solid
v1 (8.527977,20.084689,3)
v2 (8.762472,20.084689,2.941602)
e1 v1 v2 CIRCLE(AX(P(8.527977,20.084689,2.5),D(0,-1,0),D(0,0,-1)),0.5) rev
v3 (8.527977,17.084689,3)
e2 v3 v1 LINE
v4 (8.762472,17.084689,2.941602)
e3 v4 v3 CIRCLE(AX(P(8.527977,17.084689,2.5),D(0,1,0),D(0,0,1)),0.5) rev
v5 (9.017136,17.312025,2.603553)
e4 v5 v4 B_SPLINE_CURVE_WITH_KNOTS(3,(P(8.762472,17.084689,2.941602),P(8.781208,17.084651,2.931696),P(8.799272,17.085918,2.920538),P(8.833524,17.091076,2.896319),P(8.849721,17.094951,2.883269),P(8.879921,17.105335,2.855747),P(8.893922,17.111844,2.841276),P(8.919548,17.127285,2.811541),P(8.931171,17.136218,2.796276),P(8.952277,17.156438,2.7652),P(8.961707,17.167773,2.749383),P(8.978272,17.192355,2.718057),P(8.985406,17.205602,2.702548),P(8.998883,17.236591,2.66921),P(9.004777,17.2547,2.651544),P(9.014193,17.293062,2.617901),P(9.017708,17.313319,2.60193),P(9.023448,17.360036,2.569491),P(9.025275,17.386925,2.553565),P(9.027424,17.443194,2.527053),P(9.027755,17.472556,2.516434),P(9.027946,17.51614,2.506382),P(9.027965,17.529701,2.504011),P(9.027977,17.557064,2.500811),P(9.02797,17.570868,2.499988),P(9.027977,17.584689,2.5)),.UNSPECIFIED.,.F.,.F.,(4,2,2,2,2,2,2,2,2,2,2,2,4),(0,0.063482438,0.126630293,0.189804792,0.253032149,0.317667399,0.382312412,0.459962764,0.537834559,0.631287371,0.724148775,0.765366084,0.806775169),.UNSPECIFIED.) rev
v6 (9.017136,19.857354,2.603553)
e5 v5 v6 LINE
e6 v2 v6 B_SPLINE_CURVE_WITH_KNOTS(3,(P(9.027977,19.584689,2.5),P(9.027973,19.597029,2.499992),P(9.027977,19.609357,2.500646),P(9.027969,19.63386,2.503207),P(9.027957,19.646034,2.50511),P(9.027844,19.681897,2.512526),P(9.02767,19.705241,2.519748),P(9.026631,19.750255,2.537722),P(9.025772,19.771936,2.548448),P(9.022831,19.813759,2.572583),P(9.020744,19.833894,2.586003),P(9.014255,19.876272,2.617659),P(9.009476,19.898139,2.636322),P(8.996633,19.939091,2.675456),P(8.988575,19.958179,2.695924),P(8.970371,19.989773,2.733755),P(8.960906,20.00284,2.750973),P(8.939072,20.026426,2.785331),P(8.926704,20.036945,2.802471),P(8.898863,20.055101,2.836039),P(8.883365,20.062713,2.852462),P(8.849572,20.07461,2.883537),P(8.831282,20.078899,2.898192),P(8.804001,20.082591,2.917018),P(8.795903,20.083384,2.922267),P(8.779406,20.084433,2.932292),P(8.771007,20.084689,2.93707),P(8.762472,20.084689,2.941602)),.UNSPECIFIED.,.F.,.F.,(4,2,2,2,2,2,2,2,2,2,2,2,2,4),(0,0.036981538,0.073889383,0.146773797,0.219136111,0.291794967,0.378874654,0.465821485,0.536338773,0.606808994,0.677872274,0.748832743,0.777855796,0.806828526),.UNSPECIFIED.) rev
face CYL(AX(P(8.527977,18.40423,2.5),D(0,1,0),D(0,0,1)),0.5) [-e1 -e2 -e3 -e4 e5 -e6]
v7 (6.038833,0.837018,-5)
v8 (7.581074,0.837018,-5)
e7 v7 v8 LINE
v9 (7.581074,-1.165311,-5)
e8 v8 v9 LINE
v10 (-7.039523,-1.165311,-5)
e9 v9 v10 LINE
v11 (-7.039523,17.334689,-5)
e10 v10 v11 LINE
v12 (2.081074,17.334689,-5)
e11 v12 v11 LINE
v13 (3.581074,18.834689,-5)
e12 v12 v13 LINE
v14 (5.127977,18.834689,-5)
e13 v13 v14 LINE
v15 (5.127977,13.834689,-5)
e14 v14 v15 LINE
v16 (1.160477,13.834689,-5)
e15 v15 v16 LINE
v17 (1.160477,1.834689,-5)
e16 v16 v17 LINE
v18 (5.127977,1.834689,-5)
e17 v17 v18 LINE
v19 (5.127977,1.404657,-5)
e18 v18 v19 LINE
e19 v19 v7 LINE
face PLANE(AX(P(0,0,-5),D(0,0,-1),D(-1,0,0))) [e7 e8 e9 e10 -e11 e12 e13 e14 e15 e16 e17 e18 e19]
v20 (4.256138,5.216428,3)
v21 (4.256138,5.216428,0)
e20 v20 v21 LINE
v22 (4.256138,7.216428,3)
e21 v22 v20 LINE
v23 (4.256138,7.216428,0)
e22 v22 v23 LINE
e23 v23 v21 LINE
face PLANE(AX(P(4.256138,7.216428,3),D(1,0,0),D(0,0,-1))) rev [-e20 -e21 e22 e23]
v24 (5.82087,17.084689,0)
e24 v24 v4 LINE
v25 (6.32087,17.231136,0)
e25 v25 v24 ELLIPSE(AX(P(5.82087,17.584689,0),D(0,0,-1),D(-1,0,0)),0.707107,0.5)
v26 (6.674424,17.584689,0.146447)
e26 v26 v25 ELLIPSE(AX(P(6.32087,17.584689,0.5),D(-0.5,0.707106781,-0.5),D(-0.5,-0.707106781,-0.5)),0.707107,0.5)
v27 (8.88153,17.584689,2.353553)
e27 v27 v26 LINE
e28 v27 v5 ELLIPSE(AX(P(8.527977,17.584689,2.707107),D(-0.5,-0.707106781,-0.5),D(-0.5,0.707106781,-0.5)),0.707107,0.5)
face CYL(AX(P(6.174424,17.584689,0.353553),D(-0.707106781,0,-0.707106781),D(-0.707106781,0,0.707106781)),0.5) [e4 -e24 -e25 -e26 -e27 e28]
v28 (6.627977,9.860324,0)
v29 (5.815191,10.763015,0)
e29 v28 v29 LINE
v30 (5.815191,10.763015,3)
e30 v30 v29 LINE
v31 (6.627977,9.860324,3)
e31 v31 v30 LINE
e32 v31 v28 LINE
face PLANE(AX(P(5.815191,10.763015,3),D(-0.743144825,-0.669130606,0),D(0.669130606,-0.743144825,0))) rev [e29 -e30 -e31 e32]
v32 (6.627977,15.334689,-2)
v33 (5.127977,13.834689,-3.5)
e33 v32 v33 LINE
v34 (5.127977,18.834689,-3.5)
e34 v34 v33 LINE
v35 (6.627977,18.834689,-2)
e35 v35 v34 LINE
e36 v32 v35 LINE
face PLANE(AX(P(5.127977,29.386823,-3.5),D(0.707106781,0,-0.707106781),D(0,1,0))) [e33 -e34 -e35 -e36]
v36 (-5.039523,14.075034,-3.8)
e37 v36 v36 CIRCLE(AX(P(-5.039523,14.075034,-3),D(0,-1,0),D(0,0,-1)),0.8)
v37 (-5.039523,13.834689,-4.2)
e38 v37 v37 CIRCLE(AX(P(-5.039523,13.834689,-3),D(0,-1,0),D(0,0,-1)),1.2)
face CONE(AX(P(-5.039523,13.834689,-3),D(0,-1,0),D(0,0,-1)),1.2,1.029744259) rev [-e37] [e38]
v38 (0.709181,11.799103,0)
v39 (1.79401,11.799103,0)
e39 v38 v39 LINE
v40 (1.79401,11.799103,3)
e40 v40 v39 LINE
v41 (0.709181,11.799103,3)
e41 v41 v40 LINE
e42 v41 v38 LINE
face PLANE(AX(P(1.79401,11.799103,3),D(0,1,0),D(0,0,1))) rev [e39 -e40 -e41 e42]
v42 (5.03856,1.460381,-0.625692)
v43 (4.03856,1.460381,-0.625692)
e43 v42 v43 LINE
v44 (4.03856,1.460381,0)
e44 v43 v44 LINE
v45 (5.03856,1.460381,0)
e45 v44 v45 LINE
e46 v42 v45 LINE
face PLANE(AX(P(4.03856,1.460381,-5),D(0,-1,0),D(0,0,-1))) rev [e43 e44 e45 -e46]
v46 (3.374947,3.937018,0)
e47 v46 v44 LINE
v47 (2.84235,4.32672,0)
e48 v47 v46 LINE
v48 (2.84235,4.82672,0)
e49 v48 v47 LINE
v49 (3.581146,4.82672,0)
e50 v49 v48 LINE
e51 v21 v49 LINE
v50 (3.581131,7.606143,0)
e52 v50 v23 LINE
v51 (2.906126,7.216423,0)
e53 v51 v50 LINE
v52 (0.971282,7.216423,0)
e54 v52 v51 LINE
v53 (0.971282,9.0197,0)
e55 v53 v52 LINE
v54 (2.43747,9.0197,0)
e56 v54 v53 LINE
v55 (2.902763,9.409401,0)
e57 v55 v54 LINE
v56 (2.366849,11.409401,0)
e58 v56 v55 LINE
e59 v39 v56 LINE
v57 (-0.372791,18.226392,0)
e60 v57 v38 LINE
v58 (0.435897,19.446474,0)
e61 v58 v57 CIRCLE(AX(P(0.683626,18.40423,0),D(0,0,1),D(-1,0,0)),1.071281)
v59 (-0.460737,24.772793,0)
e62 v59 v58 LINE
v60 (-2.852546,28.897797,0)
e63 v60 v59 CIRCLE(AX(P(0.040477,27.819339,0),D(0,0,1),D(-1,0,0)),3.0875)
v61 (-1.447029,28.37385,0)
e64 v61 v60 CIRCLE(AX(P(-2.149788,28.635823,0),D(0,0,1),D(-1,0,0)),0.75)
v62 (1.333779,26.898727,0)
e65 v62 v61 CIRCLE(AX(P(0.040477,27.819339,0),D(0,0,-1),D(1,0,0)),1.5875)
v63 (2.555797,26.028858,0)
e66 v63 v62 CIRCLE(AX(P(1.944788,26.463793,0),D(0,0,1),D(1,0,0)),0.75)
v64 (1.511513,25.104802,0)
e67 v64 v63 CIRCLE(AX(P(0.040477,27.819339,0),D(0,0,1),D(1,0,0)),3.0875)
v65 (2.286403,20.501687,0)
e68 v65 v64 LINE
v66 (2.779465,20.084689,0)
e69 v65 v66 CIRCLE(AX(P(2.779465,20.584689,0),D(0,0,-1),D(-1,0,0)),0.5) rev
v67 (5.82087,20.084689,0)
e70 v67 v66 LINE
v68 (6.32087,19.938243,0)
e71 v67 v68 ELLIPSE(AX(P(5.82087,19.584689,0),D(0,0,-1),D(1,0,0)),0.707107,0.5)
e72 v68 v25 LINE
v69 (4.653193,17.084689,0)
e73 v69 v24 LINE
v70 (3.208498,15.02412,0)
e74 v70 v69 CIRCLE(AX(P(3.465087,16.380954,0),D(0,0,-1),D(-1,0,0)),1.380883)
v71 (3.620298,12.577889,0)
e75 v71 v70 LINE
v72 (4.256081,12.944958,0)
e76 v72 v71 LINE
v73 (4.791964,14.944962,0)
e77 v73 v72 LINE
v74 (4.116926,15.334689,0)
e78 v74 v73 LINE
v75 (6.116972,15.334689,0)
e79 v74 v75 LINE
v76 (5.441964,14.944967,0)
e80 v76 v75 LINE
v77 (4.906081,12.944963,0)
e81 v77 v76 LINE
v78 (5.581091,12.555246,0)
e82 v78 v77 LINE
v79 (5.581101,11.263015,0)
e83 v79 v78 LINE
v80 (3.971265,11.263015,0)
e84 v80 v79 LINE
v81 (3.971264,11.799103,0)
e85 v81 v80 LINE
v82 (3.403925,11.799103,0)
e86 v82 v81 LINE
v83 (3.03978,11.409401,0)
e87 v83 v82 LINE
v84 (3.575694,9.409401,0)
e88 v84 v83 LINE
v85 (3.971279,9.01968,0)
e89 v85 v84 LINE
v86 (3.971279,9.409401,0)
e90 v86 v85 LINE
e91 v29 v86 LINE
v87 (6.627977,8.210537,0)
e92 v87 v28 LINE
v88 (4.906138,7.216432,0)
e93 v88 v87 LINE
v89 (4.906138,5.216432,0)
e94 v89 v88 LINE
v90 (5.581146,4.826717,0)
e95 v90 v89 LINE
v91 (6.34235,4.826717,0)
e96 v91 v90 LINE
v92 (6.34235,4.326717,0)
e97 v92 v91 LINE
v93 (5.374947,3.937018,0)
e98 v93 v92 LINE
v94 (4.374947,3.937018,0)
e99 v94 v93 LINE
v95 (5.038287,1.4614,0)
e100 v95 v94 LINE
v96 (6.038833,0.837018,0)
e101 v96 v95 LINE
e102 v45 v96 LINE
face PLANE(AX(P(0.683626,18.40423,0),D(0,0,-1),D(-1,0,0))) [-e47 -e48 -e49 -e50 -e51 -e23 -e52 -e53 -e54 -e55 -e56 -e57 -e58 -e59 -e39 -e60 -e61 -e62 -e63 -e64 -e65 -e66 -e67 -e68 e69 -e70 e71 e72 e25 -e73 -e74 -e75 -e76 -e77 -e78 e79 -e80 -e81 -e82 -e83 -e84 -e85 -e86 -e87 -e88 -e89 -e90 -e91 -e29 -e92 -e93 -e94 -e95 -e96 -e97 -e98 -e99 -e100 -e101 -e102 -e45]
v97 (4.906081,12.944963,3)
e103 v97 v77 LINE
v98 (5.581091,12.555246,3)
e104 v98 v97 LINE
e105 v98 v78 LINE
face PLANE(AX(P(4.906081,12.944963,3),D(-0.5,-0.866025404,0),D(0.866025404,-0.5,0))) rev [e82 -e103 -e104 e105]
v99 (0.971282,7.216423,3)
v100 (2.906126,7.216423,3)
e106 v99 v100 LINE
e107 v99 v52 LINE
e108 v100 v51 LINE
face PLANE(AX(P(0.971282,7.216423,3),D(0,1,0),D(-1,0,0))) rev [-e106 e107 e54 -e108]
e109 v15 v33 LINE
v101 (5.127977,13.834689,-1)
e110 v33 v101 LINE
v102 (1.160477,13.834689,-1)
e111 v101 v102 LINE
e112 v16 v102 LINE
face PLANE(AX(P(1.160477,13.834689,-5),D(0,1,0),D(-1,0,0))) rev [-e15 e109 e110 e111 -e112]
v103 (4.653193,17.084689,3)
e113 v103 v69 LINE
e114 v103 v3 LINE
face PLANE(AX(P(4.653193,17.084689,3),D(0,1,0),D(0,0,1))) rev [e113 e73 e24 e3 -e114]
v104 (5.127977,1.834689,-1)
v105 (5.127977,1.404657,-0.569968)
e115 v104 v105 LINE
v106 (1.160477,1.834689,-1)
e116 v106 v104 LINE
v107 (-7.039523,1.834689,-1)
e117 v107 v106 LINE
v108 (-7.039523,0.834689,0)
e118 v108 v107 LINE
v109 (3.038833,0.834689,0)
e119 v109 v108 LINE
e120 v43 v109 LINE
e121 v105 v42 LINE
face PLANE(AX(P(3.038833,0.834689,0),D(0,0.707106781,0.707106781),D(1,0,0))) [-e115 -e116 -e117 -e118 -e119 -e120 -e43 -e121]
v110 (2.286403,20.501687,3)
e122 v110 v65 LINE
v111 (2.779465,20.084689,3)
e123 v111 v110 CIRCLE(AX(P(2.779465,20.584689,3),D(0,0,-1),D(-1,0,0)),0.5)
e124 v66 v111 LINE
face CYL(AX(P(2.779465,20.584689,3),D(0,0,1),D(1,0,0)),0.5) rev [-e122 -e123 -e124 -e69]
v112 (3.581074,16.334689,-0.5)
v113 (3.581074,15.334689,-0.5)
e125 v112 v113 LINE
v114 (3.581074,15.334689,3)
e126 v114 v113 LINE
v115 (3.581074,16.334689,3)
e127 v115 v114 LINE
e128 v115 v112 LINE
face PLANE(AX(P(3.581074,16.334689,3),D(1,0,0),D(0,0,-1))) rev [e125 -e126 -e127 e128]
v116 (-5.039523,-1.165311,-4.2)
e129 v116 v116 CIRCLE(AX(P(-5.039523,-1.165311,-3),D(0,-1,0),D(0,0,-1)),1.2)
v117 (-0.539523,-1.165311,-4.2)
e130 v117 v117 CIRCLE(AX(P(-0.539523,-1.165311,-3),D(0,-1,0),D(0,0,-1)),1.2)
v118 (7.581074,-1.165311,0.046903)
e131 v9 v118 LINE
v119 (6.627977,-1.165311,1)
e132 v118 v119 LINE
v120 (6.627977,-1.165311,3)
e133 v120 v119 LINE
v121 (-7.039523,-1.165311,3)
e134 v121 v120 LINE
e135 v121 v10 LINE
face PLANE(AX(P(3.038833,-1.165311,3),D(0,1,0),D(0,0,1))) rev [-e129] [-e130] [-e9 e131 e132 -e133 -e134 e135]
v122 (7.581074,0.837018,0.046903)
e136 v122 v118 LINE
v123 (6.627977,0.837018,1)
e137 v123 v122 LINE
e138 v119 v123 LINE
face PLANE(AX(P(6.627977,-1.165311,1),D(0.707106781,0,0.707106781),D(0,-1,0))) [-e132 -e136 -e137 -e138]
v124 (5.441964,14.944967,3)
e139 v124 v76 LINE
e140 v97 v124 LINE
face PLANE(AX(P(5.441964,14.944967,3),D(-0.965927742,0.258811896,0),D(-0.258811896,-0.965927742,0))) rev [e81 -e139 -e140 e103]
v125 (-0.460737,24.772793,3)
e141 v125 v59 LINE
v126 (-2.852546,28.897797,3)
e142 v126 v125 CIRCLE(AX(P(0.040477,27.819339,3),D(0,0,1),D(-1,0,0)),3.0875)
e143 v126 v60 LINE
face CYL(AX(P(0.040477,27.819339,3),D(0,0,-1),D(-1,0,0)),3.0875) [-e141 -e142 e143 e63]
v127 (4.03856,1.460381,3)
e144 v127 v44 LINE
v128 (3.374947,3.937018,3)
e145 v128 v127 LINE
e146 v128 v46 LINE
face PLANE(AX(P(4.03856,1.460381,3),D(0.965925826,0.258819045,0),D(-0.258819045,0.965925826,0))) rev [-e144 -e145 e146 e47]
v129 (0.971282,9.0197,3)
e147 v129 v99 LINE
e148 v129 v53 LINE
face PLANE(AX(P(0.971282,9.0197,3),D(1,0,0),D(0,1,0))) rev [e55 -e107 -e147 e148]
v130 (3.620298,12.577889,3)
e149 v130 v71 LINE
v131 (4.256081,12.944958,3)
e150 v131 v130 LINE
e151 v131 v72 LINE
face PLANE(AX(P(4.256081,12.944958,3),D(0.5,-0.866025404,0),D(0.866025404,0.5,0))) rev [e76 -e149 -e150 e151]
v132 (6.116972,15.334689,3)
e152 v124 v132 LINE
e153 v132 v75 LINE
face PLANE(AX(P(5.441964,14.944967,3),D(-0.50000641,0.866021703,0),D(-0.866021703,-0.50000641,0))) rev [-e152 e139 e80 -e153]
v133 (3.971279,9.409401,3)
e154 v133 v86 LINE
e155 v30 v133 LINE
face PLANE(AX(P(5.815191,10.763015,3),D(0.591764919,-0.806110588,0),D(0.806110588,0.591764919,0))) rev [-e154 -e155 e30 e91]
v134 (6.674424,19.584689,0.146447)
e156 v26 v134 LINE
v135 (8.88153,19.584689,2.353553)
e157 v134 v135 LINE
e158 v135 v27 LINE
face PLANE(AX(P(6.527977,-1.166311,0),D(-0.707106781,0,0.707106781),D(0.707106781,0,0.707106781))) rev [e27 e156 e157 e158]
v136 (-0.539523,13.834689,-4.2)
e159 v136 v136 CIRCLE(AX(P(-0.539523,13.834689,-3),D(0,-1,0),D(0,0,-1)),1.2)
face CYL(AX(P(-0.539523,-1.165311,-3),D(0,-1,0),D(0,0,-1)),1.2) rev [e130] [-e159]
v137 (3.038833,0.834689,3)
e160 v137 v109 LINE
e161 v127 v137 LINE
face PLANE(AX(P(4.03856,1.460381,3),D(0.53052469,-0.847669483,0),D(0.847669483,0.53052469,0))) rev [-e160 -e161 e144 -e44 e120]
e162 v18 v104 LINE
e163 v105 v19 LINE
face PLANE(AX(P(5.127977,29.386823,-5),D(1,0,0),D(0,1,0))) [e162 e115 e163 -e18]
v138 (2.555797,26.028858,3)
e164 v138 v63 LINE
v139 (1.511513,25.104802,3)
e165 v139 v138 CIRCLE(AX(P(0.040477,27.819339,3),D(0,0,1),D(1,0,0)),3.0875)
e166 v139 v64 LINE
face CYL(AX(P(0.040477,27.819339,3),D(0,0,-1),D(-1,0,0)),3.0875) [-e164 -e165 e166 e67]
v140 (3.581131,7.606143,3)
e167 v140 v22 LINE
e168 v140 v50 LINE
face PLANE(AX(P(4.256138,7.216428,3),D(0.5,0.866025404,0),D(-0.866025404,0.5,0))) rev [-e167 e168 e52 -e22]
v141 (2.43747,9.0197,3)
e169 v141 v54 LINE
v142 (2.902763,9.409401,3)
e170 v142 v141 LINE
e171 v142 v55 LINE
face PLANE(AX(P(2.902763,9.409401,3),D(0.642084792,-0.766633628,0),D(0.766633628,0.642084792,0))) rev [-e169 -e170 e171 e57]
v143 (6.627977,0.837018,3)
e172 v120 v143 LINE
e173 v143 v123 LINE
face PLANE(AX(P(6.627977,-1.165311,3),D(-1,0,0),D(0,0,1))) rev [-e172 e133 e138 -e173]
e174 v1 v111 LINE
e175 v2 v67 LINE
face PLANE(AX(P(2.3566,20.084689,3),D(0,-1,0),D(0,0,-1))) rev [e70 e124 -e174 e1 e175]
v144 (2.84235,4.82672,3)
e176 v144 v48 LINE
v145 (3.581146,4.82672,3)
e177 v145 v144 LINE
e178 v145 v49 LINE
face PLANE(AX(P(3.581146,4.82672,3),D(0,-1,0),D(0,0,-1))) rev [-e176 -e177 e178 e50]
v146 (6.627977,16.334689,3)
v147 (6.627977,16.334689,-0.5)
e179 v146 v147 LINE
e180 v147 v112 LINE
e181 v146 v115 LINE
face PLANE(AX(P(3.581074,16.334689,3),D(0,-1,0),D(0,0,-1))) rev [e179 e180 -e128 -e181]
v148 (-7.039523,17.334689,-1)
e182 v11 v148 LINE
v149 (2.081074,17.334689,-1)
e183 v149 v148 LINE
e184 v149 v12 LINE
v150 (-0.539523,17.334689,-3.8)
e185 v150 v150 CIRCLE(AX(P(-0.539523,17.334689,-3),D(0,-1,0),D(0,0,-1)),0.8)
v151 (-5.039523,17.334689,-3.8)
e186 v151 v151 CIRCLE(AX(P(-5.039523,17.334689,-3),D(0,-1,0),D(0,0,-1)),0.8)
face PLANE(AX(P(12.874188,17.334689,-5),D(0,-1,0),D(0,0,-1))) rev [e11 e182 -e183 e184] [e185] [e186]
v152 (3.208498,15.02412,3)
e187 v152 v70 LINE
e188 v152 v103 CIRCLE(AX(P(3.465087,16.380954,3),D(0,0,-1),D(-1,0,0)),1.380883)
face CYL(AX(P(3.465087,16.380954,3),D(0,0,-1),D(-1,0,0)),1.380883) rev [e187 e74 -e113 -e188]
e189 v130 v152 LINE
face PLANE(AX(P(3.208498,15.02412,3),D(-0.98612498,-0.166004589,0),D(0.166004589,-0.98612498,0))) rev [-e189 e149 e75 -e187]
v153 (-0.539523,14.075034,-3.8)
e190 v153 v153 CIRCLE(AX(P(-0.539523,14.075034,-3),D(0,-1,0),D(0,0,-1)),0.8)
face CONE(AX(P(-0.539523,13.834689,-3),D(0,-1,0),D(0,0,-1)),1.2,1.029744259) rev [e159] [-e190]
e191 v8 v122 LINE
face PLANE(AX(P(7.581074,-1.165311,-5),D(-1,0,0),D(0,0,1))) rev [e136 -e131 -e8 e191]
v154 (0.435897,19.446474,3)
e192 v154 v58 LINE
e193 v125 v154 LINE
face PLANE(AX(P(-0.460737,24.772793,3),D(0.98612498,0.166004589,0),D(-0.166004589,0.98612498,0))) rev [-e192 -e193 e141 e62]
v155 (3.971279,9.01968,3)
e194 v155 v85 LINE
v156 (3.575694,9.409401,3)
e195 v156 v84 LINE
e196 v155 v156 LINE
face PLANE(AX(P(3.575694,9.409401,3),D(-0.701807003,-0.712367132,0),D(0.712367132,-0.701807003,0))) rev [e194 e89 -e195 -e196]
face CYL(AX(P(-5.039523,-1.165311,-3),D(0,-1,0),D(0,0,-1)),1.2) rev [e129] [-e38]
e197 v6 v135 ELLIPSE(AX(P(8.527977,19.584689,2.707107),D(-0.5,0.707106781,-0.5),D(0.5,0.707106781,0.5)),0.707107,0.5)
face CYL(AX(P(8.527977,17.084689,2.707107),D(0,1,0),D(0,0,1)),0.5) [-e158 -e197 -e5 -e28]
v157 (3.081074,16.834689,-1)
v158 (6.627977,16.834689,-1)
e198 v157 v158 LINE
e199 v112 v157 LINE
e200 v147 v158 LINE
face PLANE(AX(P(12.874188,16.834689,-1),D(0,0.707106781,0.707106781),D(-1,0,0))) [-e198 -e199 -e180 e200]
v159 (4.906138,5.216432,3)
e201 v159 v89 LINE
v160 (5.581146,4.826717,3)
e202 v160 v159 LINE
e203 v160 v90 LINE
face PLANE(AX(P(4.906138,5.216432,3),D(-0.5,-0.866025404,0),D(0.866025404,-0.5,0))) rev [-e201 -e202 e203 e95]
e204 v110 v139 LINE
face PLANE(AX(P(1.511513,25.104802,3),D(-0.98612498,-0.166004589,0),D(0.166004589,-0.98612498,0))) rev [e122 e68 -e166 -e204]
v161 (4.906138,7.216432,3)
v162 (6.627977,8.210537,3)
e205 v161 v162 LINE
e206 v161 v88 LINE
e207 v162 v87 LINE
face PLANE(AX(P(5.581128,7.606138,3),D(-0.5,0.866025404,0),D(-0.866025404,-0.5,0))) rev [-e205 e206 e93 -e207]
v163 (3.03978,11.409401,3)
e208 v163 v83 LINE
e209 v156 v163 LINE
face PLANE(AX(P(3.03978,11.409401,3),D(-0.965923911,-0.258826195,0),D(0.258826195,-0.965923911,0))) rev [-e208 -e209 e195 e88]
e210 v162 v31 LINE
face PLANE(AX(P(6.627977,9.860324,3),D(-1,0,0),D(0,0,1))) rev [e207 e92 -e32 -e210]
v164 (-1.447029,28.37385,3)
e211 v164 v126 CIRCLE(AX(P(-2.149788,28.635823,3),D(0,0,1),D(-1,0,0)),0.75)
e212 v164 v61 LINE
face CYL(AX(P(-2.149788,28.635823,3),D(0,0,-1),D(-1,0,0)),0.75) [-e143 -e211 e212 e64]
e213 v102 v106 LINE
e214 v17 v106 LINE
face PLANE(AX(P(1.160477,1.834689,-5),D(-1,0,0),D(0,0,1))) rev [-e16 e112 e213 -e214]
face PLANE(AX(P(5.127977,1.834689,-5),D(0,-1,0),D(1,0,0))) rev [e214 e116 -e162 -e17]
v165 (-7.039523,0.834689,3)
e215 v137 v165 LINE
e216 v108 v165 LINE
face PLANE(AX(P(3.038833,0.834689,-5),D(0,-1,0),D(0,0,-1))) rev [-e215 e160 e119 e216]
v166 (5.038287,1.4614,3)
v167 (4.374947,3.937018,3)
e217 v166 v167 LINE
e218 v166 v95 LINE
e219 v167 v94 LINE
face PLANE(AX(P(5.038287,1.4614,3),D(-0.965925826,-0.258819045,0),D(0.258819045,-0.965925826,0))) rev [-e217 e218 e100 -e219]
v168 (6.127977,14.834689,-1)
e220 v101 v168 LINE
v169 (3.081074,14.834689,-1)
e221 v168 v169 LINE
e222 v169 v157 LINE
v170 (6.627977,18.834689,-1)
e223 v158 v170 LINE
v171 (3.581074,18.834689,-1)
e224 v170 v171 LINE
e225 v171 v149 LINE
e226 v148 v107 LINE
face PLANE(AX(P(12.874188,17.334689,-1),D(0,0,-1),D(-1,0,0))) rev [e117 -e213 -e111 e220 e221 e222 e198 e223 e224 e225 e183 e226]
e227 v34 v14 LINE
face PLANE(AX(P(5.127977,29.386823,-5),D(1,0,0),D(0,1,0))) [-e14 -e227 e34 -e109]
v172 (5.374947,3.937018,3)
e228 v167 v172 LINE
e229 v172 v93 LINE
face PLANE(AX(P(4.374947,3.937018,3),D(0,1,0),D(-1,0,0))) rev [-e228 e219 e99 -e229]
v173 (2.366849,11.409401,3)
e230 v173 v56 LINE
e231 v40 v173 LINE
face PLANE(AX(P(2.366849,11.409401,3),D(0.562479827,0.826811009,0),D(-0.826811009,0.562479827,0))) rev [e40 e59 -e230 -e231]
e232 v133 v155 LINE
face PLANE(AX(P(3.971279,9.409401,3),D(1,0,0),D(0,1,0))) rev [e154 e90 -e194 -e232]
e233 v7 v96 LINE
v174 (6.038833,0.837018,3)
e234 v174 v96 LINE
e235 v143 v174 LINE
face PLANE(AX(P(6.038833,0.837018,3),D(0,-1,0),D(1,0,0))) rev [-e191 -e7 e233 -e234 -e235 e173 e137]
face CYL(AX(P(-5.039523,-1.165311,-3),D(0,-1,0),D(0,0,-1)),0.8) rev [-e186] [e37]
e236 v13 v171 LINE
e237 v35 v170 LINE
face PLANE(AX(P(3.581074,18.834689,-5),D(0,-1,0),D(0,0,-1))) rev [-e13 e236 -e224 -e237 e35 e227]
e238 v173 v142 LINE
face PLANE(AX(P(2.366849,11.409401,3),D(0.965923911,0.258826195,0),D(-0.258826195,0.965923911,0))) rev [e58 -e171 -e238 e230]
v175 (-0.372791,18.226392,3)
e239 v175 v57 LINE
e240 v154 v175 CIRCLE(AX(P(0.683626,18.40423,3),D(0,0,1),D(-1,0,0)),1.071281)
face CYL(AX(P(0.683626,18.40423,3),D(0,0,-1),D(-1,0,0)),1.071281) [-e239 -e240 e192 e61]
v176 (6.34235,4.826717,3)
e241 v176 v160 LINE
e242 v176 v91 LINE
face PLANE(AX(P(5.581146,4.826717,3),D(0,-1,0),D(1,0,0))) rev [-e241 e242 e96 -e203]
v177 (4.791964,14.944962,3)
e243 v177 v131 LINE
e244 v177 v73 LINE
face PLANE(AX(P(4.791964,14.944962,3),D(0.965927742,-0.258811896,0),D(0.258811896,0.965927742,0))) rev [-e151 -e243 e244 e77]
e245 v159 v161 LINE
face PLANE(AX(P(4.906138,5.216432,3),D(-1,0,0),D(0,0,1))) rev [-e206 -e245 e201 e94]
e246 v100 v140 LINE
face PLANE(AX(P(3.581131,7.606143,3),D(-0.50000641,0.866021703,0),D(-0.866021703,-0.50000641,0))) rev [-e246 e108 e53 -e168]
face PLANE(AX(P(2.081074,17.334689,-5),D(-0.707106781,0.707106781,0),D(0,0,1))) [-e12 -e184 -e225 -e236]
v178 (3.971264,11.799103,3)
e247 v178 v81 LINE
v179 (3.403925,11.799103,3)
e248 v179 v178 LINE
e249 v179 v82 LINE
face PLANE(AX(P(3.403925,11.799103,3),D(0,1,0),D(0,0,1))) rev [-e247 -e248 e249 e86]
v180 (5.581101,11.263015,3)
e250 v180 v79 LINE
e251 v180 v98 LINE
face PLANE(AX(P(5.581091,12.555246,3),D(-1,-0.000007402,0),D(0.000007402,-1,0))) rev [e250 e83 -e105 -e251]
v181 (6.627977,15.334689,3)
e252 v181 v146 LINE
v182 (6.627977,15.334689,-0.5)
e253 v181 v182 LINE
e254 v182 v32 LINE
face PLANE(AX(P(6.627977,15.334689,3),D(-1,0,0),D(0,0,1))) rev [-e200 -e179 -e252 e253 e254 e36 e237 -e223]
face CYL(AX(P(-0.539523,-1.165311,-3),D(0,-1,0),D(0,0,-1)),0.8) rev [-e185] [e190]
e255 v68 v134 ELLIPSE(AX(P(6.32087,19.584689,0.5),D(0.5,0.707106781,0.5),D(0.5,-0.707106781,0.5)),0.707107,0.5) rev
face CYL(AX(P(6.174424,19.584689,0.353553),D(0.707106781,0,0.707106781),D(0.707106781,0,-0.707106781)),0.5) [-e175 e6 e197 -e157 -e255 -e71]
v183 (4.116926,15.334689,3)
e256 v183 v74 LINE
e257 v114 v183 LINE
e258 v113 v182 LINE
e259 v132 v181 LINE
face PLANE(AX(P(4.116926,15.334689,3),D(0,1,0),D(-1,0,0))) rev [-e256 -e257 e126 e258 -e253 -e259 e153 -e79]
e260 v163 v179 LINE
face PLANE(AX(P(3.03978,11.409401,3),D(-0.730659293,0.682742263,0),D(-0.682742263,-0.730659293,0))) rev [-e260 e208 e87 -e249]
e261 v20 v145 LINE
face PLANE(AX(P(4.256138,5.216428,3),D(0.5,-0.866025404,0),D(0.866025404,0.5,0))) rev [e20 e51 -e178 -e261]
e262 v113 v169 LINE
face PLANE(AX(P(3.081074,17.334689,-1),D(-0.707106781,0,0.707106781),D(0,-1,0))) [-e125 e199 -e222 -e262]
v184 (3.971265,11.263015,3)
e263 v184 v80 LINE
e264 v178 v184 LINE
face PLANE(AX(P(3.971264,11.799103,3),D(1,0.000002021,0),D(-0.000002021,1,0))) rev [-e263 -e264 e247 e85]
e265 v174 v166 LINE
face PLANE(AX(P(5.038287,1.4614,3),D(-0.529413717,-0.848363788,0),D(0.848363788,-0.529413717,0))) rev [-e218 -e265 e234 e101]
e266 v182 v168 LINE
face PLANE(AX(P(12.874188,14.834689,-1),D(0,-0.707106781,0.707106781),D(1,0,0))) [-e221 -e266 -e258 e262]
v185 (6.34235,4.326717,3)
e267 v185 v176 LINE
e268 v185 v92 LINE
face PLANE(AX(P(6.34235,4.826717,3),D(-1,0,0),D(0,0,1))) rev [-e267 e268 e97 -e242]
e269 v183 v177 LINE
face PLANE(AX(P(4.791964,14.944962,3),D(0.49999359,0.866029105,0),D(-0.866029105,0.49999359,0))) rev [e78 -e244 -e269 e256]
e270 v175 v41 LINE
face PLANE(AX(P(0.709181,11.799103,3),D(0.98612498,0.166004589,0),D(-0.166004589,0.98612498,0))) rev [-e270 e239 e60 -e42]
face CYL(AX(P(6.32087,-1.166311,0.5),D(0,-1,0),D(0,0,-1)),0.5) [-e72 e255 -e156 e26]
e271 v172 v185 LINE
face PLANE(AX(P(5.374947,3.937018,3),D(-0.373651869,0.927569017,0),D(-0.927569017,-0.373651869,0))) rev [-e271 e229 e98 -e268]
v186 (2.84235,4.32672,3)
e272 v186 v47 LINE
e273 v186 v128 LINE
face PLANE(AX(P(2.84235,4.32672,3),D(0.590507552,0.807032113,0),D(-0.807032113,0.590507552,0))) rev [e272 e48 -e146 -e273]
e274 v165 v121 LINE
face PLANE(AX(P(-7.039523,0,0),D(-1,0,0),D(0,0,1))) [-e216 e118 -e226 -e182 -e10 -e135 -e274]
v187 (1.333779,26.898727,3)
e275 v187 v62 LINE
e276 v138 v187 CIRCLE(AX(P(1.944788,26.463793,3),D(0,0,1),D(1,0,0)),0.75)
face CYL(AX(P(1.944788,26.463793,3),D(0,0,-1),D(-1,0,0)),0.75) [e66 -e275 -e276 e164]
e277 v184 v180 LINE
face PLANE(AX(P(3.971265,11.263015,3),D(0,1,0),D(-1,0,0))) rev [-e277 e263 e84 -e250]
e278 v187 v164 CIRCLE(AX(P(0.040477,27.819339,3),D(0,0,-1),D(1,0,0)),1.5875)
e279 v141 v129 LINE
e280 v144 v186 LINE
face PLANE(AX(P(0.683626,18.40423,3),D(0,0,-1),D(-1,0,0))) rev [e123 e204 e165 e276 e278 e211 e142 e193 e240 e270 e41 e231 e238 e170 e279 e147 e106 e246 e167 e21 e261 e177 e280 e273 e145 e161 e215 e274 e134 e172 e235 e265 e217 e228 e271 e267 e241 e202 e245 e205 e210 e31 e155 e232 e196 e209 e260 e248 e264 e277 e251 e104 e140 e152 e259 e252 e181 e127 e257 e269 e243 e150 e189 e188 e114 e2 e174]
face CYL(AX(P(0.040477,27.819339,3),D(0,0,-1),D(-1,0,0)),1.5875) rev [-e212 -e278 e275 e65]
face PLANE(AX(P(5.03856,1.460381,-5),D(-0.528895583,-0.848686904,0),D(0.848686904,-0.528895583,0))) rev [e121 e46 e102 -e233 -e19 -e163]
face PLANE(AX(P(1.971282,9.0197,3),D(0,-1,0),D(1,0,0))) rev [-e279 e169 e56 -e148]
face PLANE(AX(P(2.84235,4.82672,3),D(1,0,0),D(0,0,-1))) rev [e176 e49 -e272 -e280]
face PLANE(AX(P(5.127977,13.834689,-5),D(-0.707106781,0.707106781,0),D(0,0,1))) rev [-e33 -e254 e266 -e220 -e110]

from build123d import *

# Parameters (mm, degrees)
BOSS_SWITCH_BODY_DEPTH                    = 3
SKETCH1_W                                 = 4
SKETCH1_H                                 = 3.5
BOSS_FLANGE_WIDTH_DEPTH                   = 5
BOSS_FLANGE_HEIGHT_REACH                  = 35.863
SKETCH2_W                                 = 4
SKETCH2_H                                 = 2
SKETCH2_W_2                               = 8
SKETCH24_W                                = 4
SKETCH24_H                                = 2.5
CUT_WALL_CLEARANCE_DEPTH                  = 1
CUT_UP_TO_DOWN_DERAILLEUR_CLEARANCE_REACH = 21.462
SKETCH10_W                                = 2.453096586
SKETCH10_H                                = 3
SKETCH17_W                                = 12.1675
SKETCH17_H                                = 4
BOSS_FLANGE_SUPPORT_DEPTH                 = 14.5
TAP_DRILL_FOR_M2X0_4_TAP1_D               = 1.6
M2_CLEARANCE_HOLE2_D                      = 2.4
M2_CLEARANCE_HOLE2_DEPTH                  = 15
M2_CLEARANCE_HOLE2_TIP                    = 0.721032743
CUT_UP_TO_DOWN_CANTILEVER_SLOPE_REACH     = 25.623
CHAMFER_FLANGE_SUPPORT_SIZE               = 1.5
CHAMFER_FLANGE_SUPPORT_2_SIZE             = 1.5
CHAMFER_FLANGE_SUPPORT_3_SIZE             = 1
CHAMFER3_SIZE                             = 0.5
SKETCH23_W                                = 3.9675
SKETCH23_H                                = 12
CUT_GAP_FOR_PRINTING_DEPTH                = 32.000499688
SKETCH25_W                                = 0.953096586
SKETCH25_H                                = 3.5
CUT_DERAILLEUR_CLEARANCE_DEPTH            = 32.145320369
CHAMFER8_SIZE                             = 1
FILLET1_R                                 = 0.5
FILLET2_R                                 = 0.5


# Some blends are built 0.0001 mm under size
with BuildPart() as part:
    # Sketch-SwitchBossUp → Boss-Switch Body (new body)
    with BuildSketch(Plane.XY):
        with BuildLine():
            Line((5.581091201, 12.555245643), (5.581100766, 11.263014573))
            Line((5.581100766, 11.263014573), (3.971265023, 11.263014573))
            Line((3.971265023, 11.263014573), (3.97126394, 11.799102818))
            Line((3.97126394, 11.799102818), (3.403924927, 11.799102818))
            Line((3.403924927, 11.799102818), (3.039779642, 11.409400656))
            Line((3.039779642, 11.409400656), (3.575693893, 9.409400656))
            Line((3.575693893, 9.409400656), (3.971278743, 9.019679955))
            Line((3.971278743, 9.019679955), (3.971278743, 9.409400656))
            Line((3.971278743, 9.409400656), (5.815190872, 10.763014573))
            Line((5.815190872, 10.763014573), (6.627976927, 9.860324208))
            Line((6.627976927, 9.860324208), (6.627976927, 8.210536506))
            Line((6.627976927, 8.210536506), (5.581127833, 7.606137899))
            Line((5.581127833, 7.606137899), (4.906138119, 7.216432406))
            Line((4.906138119, 7.216432406), (4.906138119, 5.216432406))
            Line((4.906138119, 5.216432406), (5.58114552, 4.826716701))
            Line((5.58114552, 4.826716701), (6.342350466, 4.826716701))
            Line((6.342350466, 4.826716701), (6.342350466, 4.326716701))
            Line((6.342350466, 4.326716701), (5.374946804, 3.937018274))
            Line((5.374946804, 3.937018274), (4.374946804, 3.937018274))
            Line((4.374946804, 3.937018274), (5.038286759, 1.461399857))
            Line((5.038286759, 1.461399857), (6.03883266, 0.837018274))
            Line((6.03883266, 0.837018274), (6.627976927, 0.837018274))
            Line((6.627976927, 0.837018274), (6.627976927, -1.165310653))
            Line((6.627976927, -1.165310653), (5.038286759, -1.165310653))
            Line((5.038286759, -1.165310653), (3.03883266, -1.165310653))
            Line((3.03883266, -1.165310653), (3.03883266, 0.834689347))
            Line((3.03883266, 0.834689347), (4.03855971, 1.460381193))
            Line((4.03855971, 1.460381193), (3.374946804, 3.937018274))
            Line((3.374946804, 3.937018274), (2.842350466, 4.326720436))
            Line((2.842350466, 4.326720436), (2.842350466, 4.826720436))
            Line((2.842350466, 4.826720436), (3.58114552, 4.826720436))
            Line((3.58114552, 4.826720436), (4.256138119, 5.216427595))
            Line((4.256138119, 5.216427595), (4.256138119, 7.216427595))
            Line((4.256138119, 7.216427595), (3.581130717, 7.6061433))
            Line((3.581130717, 7.6061433), (2.9061262, 7.216422599))
            Line((2.9061262, 7.216422599), (0.971281627, 7.216422599))
            Line((0.971281627, 7.216422599), (0.971281627, 9.019700159))
            Line((0.971281627, 9.019700159), (1.971281627, 9.019700159))
            Line((1.971281627, 9.019700159), (2.437470124, 9.019700159))
            Line((2.437470124, 9.019700159), (2.902763041, 9.409400656))
            Line((2.902763041, 9.409400656), (2.36684879, 11.409400656))
            Line((2.36684879, 11.409400656), (1.794010401, 11.799102818))
            Line((1.794010401, 11.799102818), (0.709180957, 11.799102818))
            Line((0.709180957, 11.799102818), (-0.372790983, 18.226392362))
            ThreePointArc((-0.372790983, 18.226392362), (-0.209317989, 18.996086179), (0.435897335, 19.446473985))
            Line((0.435897335, 19.446473985), (-0.46073685, 24.772792819))
            ThreePointArc((-0.46073685, 24.772792819), (-2.630501593, 26.270619745), (-2.852546321, 28.897797067))
            ThreePointArc((-2.852546321, 28.897797067), (-1.887813913, 29.338582026), (-1.447028953, 28.373849618))
            ThreePointArc((-1.447028953, 28.373849618), (-0.703448682, 26.416936722), (1.333779254, 26.898727173))
            ThreePointArc((1.333779254, 26.898727173), (2.379722745, 27.074801628), (2.555797201, 26.028858137))
            ThreePointArc((2.555797201, 26.028858137), (2.086504637, 25.507104397), (1.511513111, 25.104801997))
            Line((1.511513111, 25.104801997), (2.35660045, 20.084689347))
            Line((2.35660045, 20.084689347), (7.435924807, 20.084689347))
            Line((7.435924807, 20.084689347), (9.027976927, 20.084689347))
            Line((9.027976927, 20.084689347), (9.027976927, 17.084689347))
            Line((9.027976927, 17.084689347), (4.653192692, 17.084689347))
            ThreePointArc((4.653192692, 17.084689347), (2.334416318, 17.173683719), (3.208498298, 15.02411991))
            Line((3.208498298, 15.02411991), (3.620297651, 12.577888564))
            Line((3.620297651, 12.577888564), (4.256080915, 12.944958203))
            Line((4.256080915, 12.944958203), (4.791964496, 14.944962169))
            Line((4.791964496, 14.944962169), (4.116925685, 15.334689347))
            Line((4.116925685, 15.334689347), (3.581073513, 15.334689347))
            Line((3.581073513, 15.334689347), (3.581073513, 16.334689347))
            Line((3.581073513, 16.334689347), (5.725580434, 16.334689347))
            Line((5.725580434, 16.334689347), (6.627976927, 16.334689347))
            Line((6.627976927, 16.334689347), (6.627976927, 15.334689347))
            Line((6.627976927, 15.334689347), (6.116971898, 15.334689347))
            Line((6.116971898, 15.334689347), (5.441964496, 14.94496698))
            Line((5.441964496, 14.94496698), (4.906080915, 12.944963014))
            Line((4.906080915, 12.944963014), (5.581091201, 12.555245643))
        make_face()
    extrude(amount=BOSS_SWITCH_BODY_DEPTH)

    # Sketch1 → Boss-Flange Width (add)
    with BuildSketch(Plane(origin=(0, 0, 0), x_dir=(-1, 0, 0), z_dir=(0, 0, -1))):
        Polygon((-7.581073513, -1.165310653), (0.412170615, -1.165310653), (0.412170615, 0.834689347), (-3.03883266, 0.834689347), (-4.03855971, 1.460381193), (-5.03855971, 1.460381193), (-6.03883266, 0.837018274), (-7.581073513, 0.837018274), align=None)
        with Locations((-5.581073513, 17.084689347)):
            Rectangle(SKETCH1_W, SKETCH1_H)
    extrude(amount=BOSS_FLANGE_WIDTH_DEPTH)

    # Sketch2 → Boss-Flange Height (add, up to next)
    with BuildSketch(Plane(origin=(-7.039523073, 0, 0), x_dir=(0, 0, -1), z_dir=(1, 0, 0)), mode=Mode.PRIVATE) as boss_flange_height_sk1:
        with Locations((3, 16.334689347)):
            Rectangle(SKETCH2_W, SKETCH2_H)
    boss_flange_height_tool1 = extrude(boss_flange_height_sk1.sketch, amount=BOSS_FLANGE_HEIGHT_REACH, mode=Mode.PRIVATE) - part.part
    # Sketch2 → Boss-Flange Height (add, up to next)
    with BuildSketch(Plane(origin=(-7.039523073, 0, 0), x_dir=(0, 0, -1), z_dir=(1, 0, 0)), mode=Mode.PRIVATE) as boss_flange_height_sk2:
        with Locations((1, -0.165310653)):
            Rectangle(SKETCH2_W_2, SKETCH2_H)
    boss_flange_height_tool2 = extrude(boss_flange_height_sk2.sketch, amount=BOSS_FLANGE_HEIGHT_REACH, mode=Mode.PRIVATE) - part.part
    add(boss_flange_height_tool1.solids().sort_by_distance((-7.039523, 16.334689, -3))[0])
    add(boss_flange_height_tool2.solids().sort_by_distance((-7.039523, -0.165311, -1))[0])

    # Sketch24 → Cut-Wall Clearance (cut)
    with BuildSketch(Plane.XY):
        with Locations((5.581073513, 17.584689347)):
            Rectangle(SKETCH24_W, SKETCH24_H)
    extrude(amount=-CUT_WALL_CLEARANCE_DEPTH, mode=Mode.SUBTRACT)

    # Sketch10 → Cut-Up-To-Down Derailleur Clearance (cut, up to next)
    with BuildSketch(Plane(origin=(0, 15.334689347, 0), x_dir=(1, 0, 0), z_dir=(0, 1, 0)), mode=Mode.PRIVATE) as cut_up_to_down_derailleur_clearance_sk1:
        with Locations((6.35452522, 3.5)):
            Rectangle(SKETCH10_W, SKETCH10_H)
    cut_up_to_down_derailleur_clearance_tool1 = extrude(cut_up_to_down_derailleur_clearance_sk1.sketch, amount=CUT_UP_TO_DOWN_DERAILLEUR_CLEARANCE_REACH, mode=Mode.PRIVATE) & part.part
    add(cut_up_to_down_derailleur_clearance_tool1.solids().sort_by_distance((6.354525, 15.334689, -3.5))[0], mode=Mode.SUBTRACT)

    # Sketch17 → Boss-Flange Support (add)
    with BuildSketch(Plane.XZ.offset(-15.334689347)):
        with Locations((-0.955773073, -3)):
            Rectangle(SKETCH17_W, SKETCH17_H)
    extrude(amount=BOSS_FLANGE_SUPPORT_DEPTH)

    # Tap Drill for M2x0.4 Tap1 (through all)
    with Locations(Plane(origin=(0, -1.165310653, 0), x_dir=(-1, 0, 0), z_dir=(0, -1, 0))):
        with Locations((5.039523073, 3), (0.539523073, 3)):
            Hole(TAP_DRILL_FOR_M2X0_4_TAP1_D / 2)

    # M2 Clearance Hole2
    with Locations(Plane.XZ.offset(1.165310653)):
        with Locations((-5.039523073, -3), (-0.539523073, -3)):
            Hole(M2_CLEARANCE_HOLE2_D / 2, depth=M2_CLEARANCE_HOLE2_DEPTH)
            with Locations((0, 0, -(M2_CLEARANCE_HOLE2_DEPTH + M2_CLEARANCE_HOLE2_TIP / 2))):  # 118° drill point
                Cone(0, M2_CLEARANCE_HOLE2_D / 2, M2_CLEARANCE_HOLE2_TIP, mode=Mode.SUBTRACT)

    # Sketch12 → Cut-Up-to-Down Cantilever Slope (cut, up to next)
    with BuildSketch(Plane(origin=(0, 20.084689347, 0), x_dir=(1, 0, 0), z_dir=(0, 1, 0)), mode=Mode.PRIVATE) as cut_up_to_down_cantilever_slope_sk1:
        Polygon((6.527976927, 0), (9.027976927, -2.5), (9.027976927, 0), align=None)
    cut_up_to_down_cantilever_slope_tool1 = extrude(cut_up_to_down_cantilever_slope_sk1.sketch, amount=-CUT_UP_TO_DOWN_CANTILEVER_SLOPE_REACH, mode=Mode.PRIVATE) & part.part
    add(cut_up_to_down_cantilever_slope_tool1.solids().sort_by_distance((8.194644, 20.084689, 0.833333))[0], mode=Mode.SUBTRACT)

    # Chamfer-Flange Support
    chamfer_flange_support_edges = [part.edges().sort_by_distance(p)[0] for p in [
        (3.581073513, 17.334689347, -3),
    ]]
    chamfer(chamfer_flange_support_edges, length=CHAMFER_FLANGE_SUPPORT_SIZE - 0.0001)  # a hair under: the kernel refuses the full size

    # Chamfer-Flange Support 2
    chamfer_flange_support_2_edges = [part.edges().sort_by_distance(p)[0] for p in [
        (5.127976927, 17.084689347, -2),
        (5.127976927, 15.334689347, -1.5),
    ]]
    chamfer(chamfer_flange_support_2_edges, length=CHAMFER_FLANGE_SUPPORT_2_SIZE)

    # Chamfer-Flange Support 3
    chamfer_flange_support_3_edges = [part.edges().sort_by_distance(p)[0] for p in [
        (-2.000345206, 0.834689347, -1),
    ]]
    chamfer(chamfer_flange_support_3_edges, length=CHAMFER_FLANGE_SUPPORT_3_SIZE)

    # Chamfer3
    chamfer3_edges = [part.edges().sort_by_distance(p)[0] for p in [
        (3.581073513, 15.834689347, -1),
        (5.581073513, 16.334689347, -1),
        (5.10452522, 15.334689347, -1),
    ]]
    chamfer(chamfer3_edges, length=CHAMFER3_SIZE)

    # Sketch23 → Cut-Gap for Printing (cut, through all)
    with BuildSketch(Plane.XY.offset(-1)):
        with Locations((3.144226927, 7.834689347)):
            Rectangle(SKETCH23_W, SKETCH23_H)
    extrude(amount=-CUT_GAP_FOR_PRINTING_DEPTH, mode=Mode.SUBTRACT)

    # Sketch25 → Cut-Derailleur Clearance (cut, through all)
    with BuildSketch(Plane.XY):
        with Locations((7.10452522, 17.084689347)):
            Rectangle(SKETCH25_W, SKETCH25_H)
    extrude(amount=-CUT_DERAILLEUR_CLEARANCE_DEPTH, mode=Mode.SUBTRACT)

    # Chamfer8
    # the kernel refuses this chamfer: 1 mm, written as the material it adds along each edge
    with BuildSketch(Plane(origin=(6.627976927, 0.837018274, 0), x_dir=(0.9996219169112968, 0, -0.027495876610586365), z_dir=(0, -1, 0))) as chamfer8_piece_1_section:
        Polygon((CHAMFER8_SIZE * 0.999621916911, CHAMFER8_SIZE * 0.0274958766106), (-CHAMFER8_SIZE * 0.0274958766106, CHAMFER8_SIZE * 0.999621916911), (0, 0), align=None)
    chamfer8_piece_1 = extrude(amount=2.002328927, mode=Mode.PRIVATE)
    chamfer8_piece_1 = split(chamfer8_piece_1, bisect_by=Plane(origin=(7.581073513, -0.16414619, 0.332375145), z_dir=(-1, 0, 0)), keep=Keep.TOP, mode=Mode.PRIVATE)
    add(chamfer8_piece_1)

    # Fillet1
    # the kernel refuses this fillet: 0.5 mm, written as the material it takes off along each edge
    with BuildSketch(Plane(origin=(6.527976927, 20.6024563, 0), x_dir=(-1, 0, 0), z_dir=(0, -1, 0))) as fillet1_piece_1:
        with BuildLine():
            CenterArc((FILLET1_R * 0.414213562373, -FILLET1_R), FILLET1_R, 90, 45)
            Line((-FILLET1_R * 0.292893218813, -FILLET1_R * 0.292893218813), (0, 0))
            Line((0, 0), (FILLET1_R * 0.414213562373, 0))
        make_face()
    extrude(amount=4.035533906, mode=Mode.SUBTRACT)
    with BuildSketch(Plane(origin=(9.027976927, 21.334689347, 3), x_dir=(0, 0, -1), z_dir=(0, -1, 0))) as fillet1_piece_2:
        with BuildLine():
            CenterArc((FILLET1_R, -FILLET1_R), FILLET1_R, 90, 90)
            Line((0, -FILLET1_R), (0, 0))
            Line((0, 0), (FILLET1_R, 0))
        make_face()
    extrude(amount=5.5, mode=Mode.SUBTRACT)
    with BuildSketch(Plane(origin=(5.644093451, 20.084689347, -0.883883476), x_dir=(-0.7071067811865437, 0, 0.7071067811865512), z_dir=(0.7071067811865513, 0, 0.7071067811865437)), Plane(origin=(5.644093451, 17.084689347, -0.883883476), x_dir=(0, 1, 0), z_dir=(0.7071067811865513, 0, 0.7071067811865437))) as fillet1_piece_3:
        with BuildLine():
            CenterArc((FILLET1_R, FILLET1_R), FILLET1_R, 180, 90)
            Line((0, FILLET1_R), (0, 0))
            Line((0, 0), (FILLET1_R, 0))
        make_face()
    extrude(amount=6.035533906, mode=Mode.SUBTRACT)
    with BuildSketch(Plane(origin=(9.027976927, 20.6024563, 2.5), x_dir=(0, 0, 1), z_dir=(0, -1, 0))) as fillet1_piece_4:
        with BuildLine():
            CenterArc((FILLET1_R * 0.414213562373, FILLET1_R), FILLET1_R, 225, 45)
            Line((-FILLET1_R * 0.292893218813, FILLET1_R * 0.292893218813), (0, 0))
            Line((0, 0), (FILLET1_R * 0.414213562373, 0))
        make_face()
    extrude(amount=4.035533906, mode=Mode.SUBTRACT)

    # Fillet2
    fillet2_edges = [part.edges().sort_by_distance(p)[0] for p in [
        (2.35660045, 20.084689347, 1.5),
    ]]
    fillet(fillet2_edges, radius=FILLET2_R)


solid = part.part
